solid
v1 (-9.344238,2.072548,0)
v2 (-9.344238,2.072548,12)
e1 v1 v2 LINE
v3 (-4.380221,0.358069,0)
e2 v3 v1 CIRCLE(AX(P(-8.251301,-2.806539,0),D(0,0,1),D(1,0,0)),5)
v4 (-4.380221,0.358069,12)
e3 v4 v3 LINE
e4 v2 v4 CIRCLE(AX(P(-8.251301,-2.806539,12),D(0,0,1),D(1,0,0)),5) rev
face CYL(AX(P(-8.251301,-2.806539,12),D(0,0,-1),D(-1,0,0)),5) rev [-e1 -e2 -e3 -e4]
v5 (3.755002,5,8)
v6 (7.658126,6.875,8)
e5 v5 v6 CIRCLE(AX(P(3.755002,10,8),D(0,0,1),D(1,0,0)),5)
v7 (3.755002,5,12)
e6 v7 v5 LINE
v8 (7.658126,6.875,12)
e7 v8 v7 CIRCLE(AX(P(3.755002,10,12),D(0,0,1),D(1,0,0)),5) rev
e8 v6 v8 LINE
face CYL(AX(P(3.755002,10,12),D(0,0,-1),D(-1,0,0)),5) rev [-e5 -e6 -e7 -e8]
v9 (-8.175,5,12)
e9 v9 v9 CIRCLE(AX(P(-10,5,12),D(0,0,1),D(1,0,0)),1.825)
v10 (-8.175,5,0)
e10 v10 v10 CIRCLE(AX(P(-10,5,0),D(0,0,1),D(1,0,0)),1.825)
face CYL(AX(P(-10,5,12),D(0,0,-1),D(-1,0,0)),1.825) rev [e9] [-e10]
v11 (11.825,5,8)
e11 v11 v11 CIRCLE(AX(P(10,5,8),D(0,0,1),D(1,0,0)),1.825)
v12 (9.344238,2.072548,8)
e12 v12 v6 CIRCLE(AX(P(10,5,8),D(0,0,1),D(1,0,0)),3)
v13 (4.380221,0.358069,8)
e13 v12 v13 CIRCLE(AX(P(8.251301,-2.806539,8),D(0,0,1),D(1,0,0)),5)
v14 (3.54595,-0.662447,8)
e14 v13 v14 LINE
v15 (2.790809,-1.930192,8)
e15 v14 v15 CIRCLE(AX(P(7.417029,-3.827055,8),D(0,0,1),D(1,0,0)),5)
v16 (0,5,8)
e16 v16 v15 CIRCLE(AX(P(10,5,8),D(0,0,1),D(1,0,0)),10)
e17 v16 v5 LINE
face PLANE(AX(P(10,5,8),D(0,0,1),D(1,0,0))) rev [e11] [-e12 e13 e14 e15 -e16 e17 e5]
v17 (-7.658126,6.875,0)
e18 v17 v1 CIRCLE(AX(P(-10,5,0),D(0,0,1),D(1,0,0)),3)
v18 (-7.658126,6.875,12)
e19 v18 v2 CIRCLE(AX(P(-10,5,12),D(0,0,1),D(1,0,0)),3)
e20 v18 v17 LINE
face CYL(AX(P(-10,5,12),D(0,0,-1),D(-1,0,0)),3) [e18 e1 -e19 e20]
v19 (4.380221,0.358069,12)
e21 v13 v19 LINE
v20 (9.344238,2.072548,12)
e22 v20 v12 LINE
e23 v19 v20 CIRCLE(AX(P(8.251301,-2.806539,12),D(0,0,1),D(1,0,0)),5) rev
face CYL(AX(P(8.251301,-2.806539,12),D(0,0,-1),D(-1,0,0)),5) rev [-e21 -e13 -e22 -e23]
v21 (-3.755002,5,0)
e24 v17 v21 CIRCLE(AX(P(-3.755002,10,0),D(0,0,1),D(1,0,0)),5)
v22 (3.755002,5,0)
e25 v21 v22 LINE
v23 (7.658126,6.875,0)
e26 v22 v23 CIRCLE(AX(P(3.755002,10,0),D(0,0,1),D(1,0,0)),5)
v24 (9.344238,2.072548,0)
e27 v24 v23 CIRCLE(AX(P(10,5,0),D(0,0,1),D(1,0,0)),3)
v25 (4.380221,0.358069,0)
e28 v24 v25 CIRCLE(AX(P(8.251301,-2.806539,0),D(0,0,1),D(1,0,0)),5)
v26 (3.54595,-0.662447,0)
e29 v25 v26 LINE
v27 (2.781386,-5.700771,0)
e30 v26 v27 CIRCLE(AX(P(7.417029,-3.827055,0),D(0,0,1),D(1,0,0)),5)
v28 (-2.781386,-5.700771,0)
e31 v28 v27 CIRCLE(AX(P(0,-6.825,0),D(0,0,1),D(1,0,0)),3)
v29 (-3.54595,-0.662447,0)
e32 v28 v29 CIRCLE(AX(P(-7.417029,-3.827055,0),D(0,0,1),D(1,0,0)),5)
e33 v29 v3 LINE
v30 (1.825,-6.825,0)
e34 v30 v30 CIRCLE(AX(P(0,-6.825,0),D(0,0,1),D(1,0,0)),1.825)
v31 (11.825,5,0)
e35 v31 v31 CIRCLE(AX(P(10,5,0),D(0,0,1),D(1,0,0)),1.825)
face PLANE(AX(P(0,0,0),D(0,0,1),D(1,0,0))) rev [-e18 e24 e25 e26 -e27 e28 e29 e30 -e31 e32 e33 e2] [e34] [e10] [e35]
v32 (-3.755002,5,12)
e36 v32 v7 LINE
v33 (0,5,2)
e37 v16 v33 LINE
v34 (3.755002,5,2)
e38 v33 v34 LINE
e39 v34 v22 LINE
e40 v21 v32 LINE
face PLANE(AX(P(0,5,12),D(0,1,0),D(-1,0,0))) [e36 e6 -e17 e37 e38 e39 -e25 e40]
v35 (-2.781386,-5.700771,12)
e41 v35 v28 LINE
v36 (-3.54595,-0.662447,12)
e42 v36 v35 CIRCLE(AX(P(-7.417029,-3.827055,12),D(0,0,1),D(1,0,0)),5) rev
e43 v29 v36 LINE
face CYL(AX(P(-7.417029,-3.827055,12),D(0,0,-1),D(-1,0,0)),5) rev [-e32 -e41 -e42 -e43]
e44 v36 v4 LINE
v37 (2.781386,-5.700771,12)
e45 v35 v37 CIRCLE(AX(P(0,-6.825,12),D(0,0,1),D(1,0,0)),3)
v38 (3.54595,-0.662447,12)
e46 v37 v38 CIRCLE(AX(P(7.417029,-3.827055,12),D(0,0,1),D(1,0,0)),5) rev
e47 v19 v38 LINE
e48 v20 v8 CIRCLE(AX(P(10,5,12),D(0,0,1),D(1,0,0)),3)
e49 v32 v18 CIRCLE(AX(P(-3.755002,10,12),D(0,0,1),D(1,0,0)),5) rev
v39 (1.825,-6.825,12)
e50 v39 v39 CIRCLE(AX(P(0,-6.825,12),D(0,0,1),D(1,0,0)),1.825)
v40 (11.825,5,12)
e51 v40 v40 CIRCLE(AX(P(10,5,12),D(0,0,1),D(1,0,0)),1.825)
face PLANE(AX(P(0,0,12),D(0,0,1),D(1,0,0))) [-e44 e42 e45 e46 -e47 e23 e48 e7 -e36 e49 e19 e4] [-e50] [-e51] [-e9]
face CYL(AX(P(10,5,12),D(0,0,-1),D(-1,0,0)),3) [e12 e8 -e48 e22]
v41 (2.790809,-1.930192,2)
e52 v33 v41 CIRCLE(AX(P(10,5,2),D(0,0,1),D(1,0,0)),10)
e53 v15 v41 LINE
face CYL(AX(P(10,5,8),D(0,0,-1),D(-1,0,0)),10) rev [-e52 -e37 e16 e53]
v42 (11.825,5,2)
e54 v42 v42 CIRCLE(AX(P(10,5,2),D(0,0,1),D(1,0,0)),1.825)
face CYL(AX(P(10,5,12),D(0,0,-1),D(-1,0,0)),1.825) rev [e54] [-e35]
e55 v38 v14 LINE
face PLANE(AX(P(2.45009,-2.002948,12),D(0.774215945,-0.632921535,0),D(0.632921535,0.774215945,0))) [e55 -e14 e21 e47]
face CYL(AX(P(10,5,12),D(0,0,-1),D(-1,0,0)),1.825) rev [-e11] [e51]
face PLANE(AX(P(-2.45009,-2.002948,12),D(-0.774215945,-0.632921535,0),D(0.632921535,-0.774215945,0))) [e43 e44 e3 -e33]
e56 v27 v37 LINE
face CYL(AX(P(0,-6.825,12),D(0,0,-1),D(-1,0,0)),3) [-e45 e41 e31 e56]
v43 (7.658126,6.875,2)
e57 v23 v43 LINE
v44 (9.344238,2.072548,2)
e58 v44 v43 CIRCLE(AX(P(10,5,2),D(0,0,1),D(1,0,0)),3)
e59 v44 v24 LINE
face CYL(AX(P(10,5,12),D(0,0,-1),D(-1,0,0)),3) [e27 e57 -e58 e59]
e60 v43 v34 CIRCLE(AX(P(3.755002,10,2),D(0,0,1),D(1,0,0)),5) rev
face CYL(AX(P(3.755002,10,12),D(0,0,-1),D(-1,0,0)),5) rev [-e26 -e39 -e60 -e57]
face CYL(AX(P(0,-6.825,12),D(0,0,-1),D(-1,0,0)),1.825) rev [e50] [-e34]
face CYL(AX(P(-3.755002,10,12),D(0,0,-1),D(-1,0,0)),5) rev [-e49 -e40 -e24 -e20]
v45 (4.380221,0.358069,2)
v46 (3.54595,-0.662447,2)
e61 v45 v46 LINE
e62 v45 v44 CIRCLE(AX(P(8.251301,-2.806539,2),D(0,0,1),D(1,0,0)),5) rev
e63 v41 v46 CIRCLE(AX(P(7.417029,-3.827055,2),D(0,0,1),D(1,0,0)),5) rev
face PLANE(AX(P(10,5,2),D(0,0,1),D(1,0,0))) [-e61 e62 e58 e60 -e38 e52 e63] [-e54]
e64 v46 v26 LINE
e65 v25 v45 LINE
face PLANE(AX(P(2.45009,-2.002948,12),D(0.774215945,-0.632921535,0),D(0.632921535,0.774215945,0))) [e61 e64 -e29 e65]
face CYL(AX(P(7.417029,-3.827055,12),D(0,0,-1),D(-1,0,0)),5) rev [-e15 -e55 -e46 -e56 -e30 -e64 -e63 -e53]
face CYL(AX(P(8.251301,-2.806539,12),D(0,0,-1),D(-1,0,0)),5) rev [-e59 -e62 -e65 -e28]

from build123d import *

# Parameters (mm, degrees)
ESQUISSE2_R             = 3
ESQUISSE2_R_2           = 1.825
BOSS_EXTRU_1_DEPTH      = 12
ESQUISSE3_R             = 10
ENL_V_MAT_EXTRU_1_DEPTH = 6
CONG_1_R                = 5
FILLET1_R               = 5


with BuildPart() as part:
    # Esquisse2 → Boss.-Extru.1 (new body)
    # profile 1 of 4: a face of its own
    with BuildSketch(Plane.XY):
        with Locations((-10, 5)):
            Circle(ESQUISSE2_R)
        with Locations((-10, 5)):
            Circle(ESQUISSE2_R_2, mode=Mode.SUBTRACT)
    # profile 2 of 4: a face of its own
    with BuildSketch(Plane.XY):
        with Locations((10, 5)):
            Circle(ESQUISSE2_R)
        with Locations((10, 5)):
            Circle(ESQUISSE2_R_2, mode=Mode.SUBTRACT)
    # profile 3 of 4: a face of its own
    with BuildSketch(Plane.XY):
        with Locations((0, -6.825)):
            Circle(ESQUISSE2_R)
        with Locations((0, -6.825)):
            Circle(ESQUISSE2_R_2, mode=Mode.SUBTRACT)
    # profile 4 of 4: a face of its own
    with BuildSketch(Plane.XY):
        Polygon((-8.175, 5), (8.175, 5), (0, -5), align=None)
    extrude(amount=BOSS_EXTRU_1_DEPTH)

    # Esquisse3 → Enlèv. mat.-Extru.1 (cut)
    with BuildSketch(Plane.XY.offset(2)):
        with Locations((10, 5)):
            Circle(ESQUISSE3_R)
    extrude(amount=ENL_V_MAT_EXTRU_1_DEPTH, mode=Mode.SUBTRACT)

    # Congé1
    # the kernel refuses this fillet: 5 mm, written as the material it adds along each edge
    with BuildSketch(Plane(origin=(-7, 5, 0), x_dir=(-0.3311912213512006, 0.9435636570469954, 0), z_dir=(0, 0, 1))) as cong_1_piece_1:
        with BuildLine():
            CenterArc((3.643103435, -4.717818285), CONG_1_R, 109.341093727, 51.317812547)
            Line((-1.07471485, -3.061862178), (0, 0))
            ThreePointArc((0, 0), (0.993573664, -0.169309029), (1.987147328, 0))
        make_face()
    extrude(amount=12)
    with BuildSketch(Plane(origin=(-7.231093941, 3.845374851, 12), x_dir=(-0.7661000074497634, -0.6427213848826507, 0), z_dir=(0, 0, -1))) as cong_1_piece_2:
        with BuildLine():
            CenterArc((5.056907819, -4.440322454), CONG_1_R, 117.368969646, 63.360078756)
            Line((0.057312583, -4.503942212), (0, 0))
            ThreePointArc((0, 0), (1.379156678, -0.335806528), (2.758313356, 0))
        make_face()
    extrude(amount=12)
    with BuildSketch(Plane(origin=(-0.858096974, -3.950340093, 12), x_dir=(-0.6329215353519139, 0.7742159453846039, 0), z_dir=(0, 0, -1))) as cong_1_piece_3:
        with BuildLine():
            CenterArc((4.246739065, -5), CONG_1_R, 90, 61.27443838)
            ThreePointArc((-0.137920096, -2.596926126), (0.227062491, -1.314184518), (0, 0))
            Line((0, 0), (4.246739065, 0))
        make_face()
    extrude(amount=12)
    with BuildSketch(Plane(origin=(7.231093941, 3.845374851, 12), x_dir=(-0.6329215353519138, -0.774215945384604, 0), z_dir=(0, 0, -1))) as cong_1_piece_4:
        with BuildLine():
            CenterArc((4.504306848, -5), CONG_1_R, 90, 63.360078756)
            ThreePointArc((0.035096646, -2.758090063), (0.353327666, -1.374772245), (0, 0))
            Line((0, 0), (4.504306848, 0))
        make_face()
    extrude(amount=4)
    with BuildSketch(Plane(origin=(7, 5, 12), x_dir=(-1, 0, 0), z_dir=(0, 0, -1))) as cong_1_piece_5:
        with BuildLine():
            CenterArc((3.244997998, 5), CONG_1_R, 218.682187453, 51.317812547)
            ThreePointArc((-0.658125751, 1.875), (-0.169309029, 0.993573664), (0, 0))
            Line((0, 0), (3.244997998, 0))
        make_face()
    extrude(amount=4)
    with BuildSketch(Plane(origin=(0.858096974, -3.950340093, 12), x_dir=(0.7395598752725667, -0.6730907746261462, 0), z_dir=(0, 0, -1))) as cong_1_piece_6_section:
        with BuildLine():
            CenterArc((4.767740899, -4.505933799), CONG_1_R, 115.685497342, 61.27443838)
            Line((-0.225222573, -4.240762606), (0, 0))
            ThreePointArc((0, 0), (1.300292973, -0.29643972), (2.600585945, 0))
        make_face()
    cong_1_piece_6 = extrude(amount=12, mode=Mode.PRIVATE)
    cong_1_piece_6 = cong_1_piece_6 - Plane(origin=(10, 5, 10), x_dir=(1, 0, 0), z_dir=(0, 0, -1)) * Cylinder(10, 41, mode=Mode.PRIVATE)
    add(cong_1_piece_6)
    with BuildSketch(Plane(origin=(0.858096974, -3.950340093, 12), x_dir=(0.7395598752725667, -0.6730907746261462, 0), z_dir=(0, 0, -1))) as cong_1_piece_7_section:
        with BuildLine():
            CenterArc((4.767740899, -4.505933799), CONG_1_R, 115.685497342, 61.27443838)
            Line((-0.225222573, -4.240762606), (0, 0))
            ThreePointArc((0, 0), (1.300292973, -0.29643972), (2.600585945, 0))
        make_face()
    cong_1_piece_7 = extrude(amount=22.616847663, mode=Mode.PRIVATE)
    cong_1_piece_7 = split(cong_1_piece_7, bisect_by=Plane(origin=(2.909028405, -1.544063306, 8), z_dir=(0, 0, 1)), keep=Keep.TOP, mode=Mode.PRIVATE)
    add(cong_1_piece_7)
    with BuildSketch(Plane(origin=(0.858096974, -3.950340093, 22.616847663), x_dir=(0.7395598752725666, -0.6730907746261463, 0), z_dir=(0, 0, -1))) as cong_1_piece_8_section:
        with BuildLine():
            CenterArc((4.767740899, -4.505933799), CONG_1_R, 115.685497342, 61.27443838)
            Line((-0.225222573, -4.240762606), (0, 0))
            ThreePointArc((0, 0), (1.300292973, -0.29643972), (2.600585945, 0))
        make_face()
    cong_1_piece_8 = extrude(amount=22.616847663, mode=Mode.PRIVATE)
    cong_1_piece_8 = split(cong_1_piece_8, bisect_by=Plane(origin=(2.909028405, -1.544063306, 2), z_dir=(0, 0, -1)), keep=Keep.TOP, mode=Mode.PRIVATE)
    add(cong_1_piece_8)

    # Fillet1
    fillet1_edges = [part.edges().sort_by_distance(p)[0] for p in [
        (7.231093941, 3.845374851, 1),
        (7, 5, 1),
    ]]
    fillet(fillet1_edges, radius=FILLET1_R)


solid = part.part
